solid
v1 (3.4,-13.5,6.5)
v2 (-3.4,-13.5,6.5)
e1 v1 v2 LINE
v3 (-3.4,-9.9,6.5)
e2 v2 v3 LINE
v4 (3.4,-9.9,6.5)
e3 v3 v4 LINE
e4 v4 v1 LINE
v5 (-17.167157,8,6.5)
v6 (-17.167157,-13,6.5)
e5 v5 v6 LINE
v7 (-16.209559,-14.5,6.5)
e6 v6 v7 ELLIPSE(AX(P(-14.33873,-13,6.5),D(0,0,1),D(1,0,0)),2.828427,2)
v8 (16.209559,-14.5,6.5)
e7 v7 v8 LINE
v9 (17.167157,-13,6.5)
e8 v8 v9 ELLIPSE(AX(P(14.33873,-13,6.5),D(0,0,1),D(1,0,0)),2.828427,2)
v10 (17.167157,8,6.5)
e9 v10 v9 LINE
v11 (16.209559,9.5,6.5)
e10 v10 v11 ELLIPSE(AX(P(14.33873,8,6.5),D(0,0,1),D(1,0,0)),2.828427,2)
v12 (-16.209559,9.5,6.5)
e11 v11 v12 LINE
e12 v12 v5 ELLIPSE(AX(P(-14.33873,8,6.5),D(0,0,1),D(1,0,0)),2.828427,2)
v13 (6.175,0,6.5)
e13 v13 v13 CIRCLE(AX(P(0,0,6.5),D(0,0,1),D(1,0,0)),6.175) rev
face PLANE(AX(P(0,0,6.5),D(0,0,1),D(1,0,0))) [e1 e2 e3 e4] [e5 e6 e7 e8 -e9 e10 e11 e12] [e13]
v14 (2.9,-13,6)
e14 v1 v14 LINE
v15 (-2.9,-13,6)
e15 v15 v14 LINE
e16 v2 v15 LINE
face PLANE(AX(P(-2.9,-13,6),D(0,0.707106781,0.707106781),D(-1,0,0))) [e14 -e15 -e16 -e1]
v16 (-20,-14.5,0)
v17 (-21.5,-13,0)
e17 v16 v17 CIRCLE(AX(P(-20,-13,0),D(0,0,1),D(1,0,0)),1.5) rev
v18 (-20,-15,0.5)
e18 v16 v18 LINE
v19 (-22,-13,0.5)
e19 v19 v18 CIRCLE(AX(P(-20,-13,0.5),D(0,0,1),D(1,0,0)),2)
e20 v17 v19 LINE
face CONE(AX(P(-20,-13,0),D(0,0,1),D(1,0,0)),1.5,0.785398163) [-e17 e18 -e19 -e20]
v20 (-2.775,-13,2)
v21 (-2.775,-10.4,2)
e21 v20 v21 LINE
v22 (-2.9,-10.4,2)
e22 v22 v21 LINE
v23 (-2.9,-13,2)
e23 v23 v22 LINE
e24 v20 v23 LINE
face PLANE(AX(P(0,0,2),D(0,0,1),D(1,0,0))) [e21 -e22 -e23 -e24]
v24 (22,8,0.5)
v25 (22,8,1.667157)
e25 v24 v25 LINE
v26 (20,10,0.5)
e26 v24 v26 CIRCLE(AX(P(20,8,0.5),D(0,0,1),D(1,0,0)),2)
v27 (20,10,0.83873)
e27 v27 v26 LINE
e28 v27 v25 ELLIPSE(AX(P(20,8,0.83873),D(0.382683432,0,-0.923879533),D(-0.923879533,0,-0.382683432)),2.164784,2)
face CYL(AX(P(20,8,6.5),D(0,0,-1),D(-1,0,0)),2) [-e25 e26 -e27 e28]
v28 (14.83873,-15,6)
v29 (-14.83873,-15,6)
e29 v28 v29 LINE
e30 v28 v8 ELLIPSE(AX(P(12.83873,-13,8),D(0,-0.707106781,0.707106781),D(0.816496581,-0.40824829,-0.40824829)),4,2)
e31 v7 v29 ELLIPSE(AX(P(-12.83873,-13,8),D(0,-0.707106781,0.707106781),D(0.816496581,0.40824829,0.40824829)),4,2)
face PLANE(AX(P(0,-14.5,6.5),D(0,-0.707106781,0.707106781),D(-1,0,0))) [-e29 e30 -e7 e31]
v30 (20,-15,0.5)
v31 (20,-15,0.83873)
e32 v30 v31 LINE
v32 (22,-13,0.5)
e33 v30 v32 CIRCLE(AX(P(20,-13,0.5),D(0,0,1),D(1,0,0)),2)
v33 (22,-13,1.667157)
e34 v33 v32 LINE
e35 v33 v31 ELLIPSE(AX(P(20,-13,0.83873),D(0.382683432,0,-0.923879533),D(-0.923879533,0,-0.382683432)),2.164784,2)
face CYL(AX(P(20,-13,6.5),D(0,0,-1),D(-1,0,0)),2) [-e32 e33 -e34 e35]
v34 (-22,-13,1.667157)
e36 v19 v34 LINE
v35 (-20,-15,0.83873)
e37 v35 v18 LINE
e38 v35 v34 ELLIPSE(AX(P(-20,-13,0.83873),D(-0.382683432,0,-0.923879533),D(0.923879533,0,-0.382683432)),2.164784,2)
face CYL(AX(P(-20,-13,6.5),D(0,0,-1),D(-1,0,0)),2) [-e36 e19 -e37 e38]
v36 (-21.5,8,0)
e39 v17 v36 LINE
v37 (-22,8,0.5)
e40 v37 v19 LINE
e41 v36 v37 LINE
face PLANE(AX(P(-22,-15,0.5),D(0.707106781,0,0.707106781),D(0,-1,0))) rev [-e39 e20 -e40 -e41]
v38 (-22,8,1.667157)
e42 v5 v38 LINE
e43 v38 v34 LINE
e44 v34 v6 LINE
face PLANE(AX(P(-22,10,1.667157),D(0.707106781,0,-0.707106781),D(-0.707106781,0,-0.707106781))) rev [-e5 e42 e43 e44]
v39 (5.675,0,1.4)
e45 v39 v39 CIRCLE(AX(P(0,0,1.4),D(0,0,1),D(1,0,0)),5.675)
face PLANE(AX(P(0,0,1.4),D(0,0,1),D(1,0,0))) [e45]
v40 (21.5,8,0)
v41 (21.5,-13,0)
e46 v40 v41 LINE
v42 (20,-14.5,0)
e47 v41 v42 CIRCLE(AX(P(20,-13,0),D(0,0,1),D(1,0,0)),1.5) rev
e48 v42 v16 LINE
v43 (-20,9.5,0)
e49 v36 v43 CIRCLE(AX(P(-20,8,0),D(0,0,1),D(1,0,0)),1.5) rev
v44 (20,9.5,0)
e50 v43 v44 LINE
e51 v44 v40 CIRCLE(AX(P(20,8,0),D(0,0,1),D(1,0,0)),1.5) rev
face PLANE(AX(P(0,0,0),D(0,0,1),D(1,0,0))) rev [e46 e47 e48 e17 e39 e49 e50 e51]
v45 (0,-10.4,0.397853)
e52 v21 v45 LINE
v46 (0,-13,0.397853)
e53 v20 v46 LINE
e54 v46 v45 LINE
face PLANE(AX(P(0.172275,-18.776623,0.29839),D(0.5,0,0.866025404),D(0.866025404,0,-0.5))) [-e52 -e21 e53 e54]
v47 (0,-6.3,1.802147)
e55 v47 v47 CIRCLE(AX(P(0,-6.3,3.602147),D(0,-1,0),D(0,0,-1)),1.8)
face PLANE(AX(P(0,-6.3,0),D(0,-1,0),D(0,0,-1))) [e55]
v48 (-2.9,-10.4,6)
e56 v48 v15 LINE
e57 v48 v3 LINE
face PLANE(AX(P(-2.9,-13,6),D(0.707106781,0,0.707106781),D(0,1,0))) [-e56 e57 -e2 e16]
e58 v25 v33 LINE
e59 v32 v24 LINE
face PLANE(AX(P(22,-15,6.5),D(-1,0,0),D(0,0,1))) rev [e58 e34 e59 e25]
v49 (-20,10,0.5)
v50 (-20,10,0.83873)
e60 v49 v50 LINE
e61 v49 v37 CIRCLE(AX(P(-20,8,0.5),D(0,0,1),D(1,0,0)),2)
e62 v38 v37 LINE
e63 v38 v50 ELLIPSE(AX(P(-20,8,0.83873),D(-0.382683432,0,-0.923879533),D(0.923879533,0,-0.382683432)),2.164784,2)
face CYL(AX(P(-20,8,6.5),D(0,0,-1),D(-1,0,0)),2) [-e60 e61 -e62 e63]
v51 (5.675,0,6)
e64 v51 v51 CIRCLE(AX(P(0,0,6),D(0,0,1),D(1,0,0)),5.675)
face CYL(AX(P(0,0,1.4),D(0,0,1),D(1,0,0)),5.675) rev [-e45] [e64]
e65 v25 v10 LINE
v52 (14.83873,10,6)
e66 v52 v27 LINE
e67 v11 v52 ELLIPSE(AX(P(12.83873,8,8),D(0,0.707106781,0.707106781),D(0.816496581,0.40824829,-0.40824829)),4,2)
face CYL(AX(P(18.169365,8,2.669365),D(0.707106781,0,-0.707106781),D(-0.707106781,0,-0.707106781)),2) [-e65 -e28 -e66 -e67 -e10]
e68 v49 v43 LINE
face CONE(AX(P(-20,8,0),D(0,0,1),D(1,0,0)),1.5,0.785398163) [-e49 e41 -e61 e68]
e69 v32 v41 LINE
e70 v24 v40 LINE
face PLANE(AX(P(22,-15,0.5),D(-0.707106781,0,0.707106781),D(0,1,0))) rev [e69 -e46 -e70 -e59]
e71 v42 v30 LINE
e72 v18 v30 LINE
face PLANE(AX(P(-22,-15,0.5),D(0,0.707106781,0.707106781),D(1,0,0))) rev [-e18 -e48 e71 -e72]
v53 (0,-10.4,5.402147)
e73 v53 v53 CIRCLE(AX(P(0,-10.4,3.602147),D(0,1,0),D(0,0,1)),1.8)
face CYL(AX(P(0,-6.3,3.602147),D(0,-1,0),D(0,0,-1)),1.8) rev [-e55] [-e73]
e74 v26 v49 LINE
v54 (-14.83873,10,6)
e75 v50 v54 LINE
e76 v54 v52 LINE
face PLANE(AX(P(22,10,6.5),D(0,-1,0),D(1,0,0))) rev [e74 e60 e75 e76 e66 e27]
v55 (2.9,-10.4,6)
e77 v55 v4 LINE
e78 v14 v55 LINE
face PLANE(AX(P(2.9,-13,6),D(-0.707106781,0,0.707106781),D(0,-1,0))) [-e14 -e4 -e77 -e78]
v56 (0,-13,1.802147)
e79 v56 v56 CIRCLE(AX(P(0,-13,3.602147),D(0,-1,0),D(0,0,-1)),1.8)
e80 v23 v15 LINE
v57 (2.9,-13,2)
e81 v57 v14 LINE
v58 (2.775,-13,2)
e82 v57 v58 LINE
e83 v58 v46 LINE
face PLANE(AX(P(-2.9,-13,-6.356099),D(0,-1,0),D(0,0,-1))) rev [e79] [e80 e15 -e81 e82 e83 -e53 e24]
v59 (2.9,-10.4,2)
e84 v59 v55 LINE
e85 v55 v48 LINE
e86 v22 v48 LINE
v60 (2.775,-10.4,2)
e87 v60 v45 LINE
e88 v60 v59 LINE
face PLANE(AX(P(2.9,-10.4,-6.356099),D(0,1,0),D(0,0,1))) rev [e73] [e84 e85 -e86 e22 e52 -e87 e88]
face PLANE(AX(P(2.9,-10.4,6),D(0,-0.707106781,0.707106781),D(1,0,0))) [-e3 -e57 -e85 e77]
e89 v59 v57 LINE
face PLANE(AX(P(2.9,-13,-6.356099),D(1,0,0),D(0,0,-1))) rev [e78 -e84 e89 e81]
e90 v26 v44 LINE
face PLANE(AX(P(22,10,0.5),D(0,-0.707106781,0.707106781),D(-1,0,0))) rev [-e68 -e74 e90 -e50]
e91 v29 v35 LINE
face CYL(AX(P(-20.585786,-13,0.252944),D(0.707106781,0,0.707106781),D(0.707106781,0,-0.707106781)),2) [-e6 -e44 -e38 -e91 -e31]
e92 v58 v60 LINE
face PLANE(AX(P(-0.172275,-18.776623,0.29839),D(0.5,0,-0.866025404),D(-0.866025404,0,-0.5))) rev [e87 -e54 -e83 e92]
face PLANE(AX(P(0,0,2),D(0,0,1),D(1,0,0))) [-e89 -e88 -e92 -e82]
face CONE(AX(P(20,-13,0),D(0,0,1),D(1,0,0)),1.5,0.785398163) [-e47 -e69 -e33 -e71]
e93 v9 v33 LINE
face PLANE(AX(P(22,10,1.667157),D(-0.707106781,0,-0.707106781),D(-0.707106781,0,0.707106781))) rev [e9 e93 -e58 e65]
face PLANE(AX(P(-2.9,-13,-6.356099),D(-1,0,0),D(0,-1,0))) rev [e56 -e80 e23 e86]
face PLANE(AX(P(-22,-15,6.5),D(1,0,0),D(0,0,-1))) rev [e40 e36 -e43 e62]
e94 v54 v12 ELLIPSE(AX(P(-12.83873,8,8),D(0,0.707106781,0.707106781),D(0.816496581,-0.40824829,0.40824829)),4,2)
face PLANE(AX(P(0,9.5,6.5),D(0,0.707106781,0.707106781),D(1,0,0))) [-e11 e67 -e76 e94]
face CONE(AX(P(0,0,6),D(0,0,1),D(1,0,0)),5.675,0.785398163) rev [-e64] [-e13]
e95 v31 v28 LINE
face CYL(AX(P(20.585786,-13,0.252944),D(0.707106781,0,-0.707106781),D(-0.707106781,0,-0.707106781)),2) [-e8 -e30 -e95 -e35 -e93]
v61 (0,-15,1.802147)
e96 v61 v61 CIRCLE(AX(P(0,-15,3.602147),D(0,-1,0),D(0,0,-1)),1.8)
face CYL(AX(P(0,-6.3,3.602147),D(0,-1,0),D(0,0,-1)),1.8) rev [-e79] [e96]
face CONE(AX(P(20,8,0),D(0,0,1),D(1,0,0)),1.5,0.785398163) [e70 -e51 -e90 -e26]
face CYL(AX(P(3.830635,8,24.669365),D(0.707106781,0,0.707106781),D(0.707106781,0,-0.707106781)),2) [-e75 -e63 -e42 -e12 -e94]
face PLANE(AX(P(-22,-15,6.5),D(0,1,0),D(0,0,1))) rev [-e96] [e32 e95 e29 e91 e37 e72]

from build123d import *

# Parameters (mm, degrees)
SKIZZE1_W                            = 44
SKIZZE1_H                            = 25
AUFSATZ_LINEAR_AUSTRAGEN1_DEPTH      = 6.5
SKIZZE2_R                            = 5.675
SCHNITT_LINEAR_AUSTRAGEN1_DEPTH      = 5.1
VERRUNDUNG1_R                        = 2
SKIZZE8_W                            = 5.8
SKIZZE8_H                            = 2.6
SCHNITT_LINEAR_AUSTRAGEN5_DEPTH      = 4.5
SCHNITT_LINEAR_AUSTRAGEN6_DEPTH      = 2.6
SCHNITT_LINEAR_AUSTRAGEN7_DEPTH      = 31.698697041
SCHNITT_LINEAR_AUSTRAGEN7_DEPTH_BACK = 4.1
SCHNITT_LINEAR_AUSTRAGEN8_DEPTH      = 34.930075155
FASE1_SIZE                           = 0.5
VERRUNDUNG2_R                        = 2


with BuildPart() as part:
    # Skizze1 → Aufsatz-Linear austragen1 (new body)
    with BuildSketch(Plane.XY):
        with Locations((0, -2.5)):
            Rectangle(SKIZZE1_W, SKIZZE1_H)
    extrude(amount=AUFSATZ_LINEAR_AUSTRAGEN1_DEPTH)

    # Skizze2 → Schnitt-Linear austragen1 (cut)
    with BuildSketch(Plane.XY.offset(6.5)):
        Circle(SKIZZE2_R)
    extrude(amount=-SCHNITT_LINEAR_AUSTRAGEN1_DEPTH, mode=Mode.SUBTRACT)

    # Verrundung1
    verrundung1_edges = [part.edges().sort_by_distance(p)[0] for p in [
        (-22, 10, 3.25),
        (22, 10, 3.25),
        (22, -15, 3.25),
        (-22, -15, 3.25),
    ]]
    fillet(verrundung1_edges, radius=VERRUNDUNG1_R)

    # Skizze8 → Schnitt-Linear austragen5 (cut)
    with BuildSketch(Plane.XY.offset(6.5)):
        with Locations((0, -11.7)):
            Rectangle(SKIZZE8_W, SKIZZE8_H)
    extrude(amount=-SCHNITT_LINEAR_AUSTRAGEN5_DEPTH, mode=Mode.SUBTRACT)

    # Skizze9 → Schnitt-Linear austragen6 (cut)
    with BuildSketch(Plane.XZ.offset(10.4)):
        with BuildLine():
            Line((-0.820441954, 2), (-2.775, 2))
            Line((-2.775, 2), (0, 0.397853003))
            Line((0, 0.397853003), (2.775, 2))
            Line((2.775, 2), (0.820441954, 2))
            ThreePointArc((0.820441954, 2), (0, 1.802146997), (-0.820441954, 2))
        make_face()
        with BuildLine():
            ThreePointArc((1.8, 3.602146997), (-0.938936761, 5.137854573), (-0.820441954, 2))
            Line((-0.820441954, 2), (0.820441954, 2))
            ThreePointArc((0.820441954, 2), (1.535707576, 2.663210236), (1.8, 3.602146997))
        make_face()
        with BuildLine():
            Line((0.820441954, 2), (-0.820441954, 2))
            ThreePointArc((-0.820441954, 2), (0, 1.802146997), (0.820441954, 2))
        make_face()
    extrude(amount=SCHNITT_LINEAR_AUSTRAGEN6_DEPTH, mode=Mode.SUBTRACT)

    # Skizze9<3> → Schnitt-Linear austragen7 (cut, two sides: drawn at the far end of the back side and taken through both)
    with BuildSketch(Plane.XZ.offset(10.4).offset(-SCHNITT_LINEAR_AUSTRAGEN7_DEPTH_BACK)):
        with BuildLine():
            ThreePointArc((1.8, 3.602146997), (-0.938936761, 5.137854573), (-0.820441954, 2))
            Line((-0.820441954, 2), (0.820441954, 2))
            ThreePointArc((0.820441954, 2), (1.535707576, 2.663210236), (1.8, 3.602146997))
        make_face()
        with BuildLine():
            Line((0.820441954, 2), (-0.820441954, 2))
            ThreePointArc((-0.820441954, 2), (0, 1.802146997), (0.820441954, 2))
        make_face()
    extrude(amount=SCHNITT_LINEAR_AUSTRAGEN7_DEPTH + SCHNITT_LINEAR_AUSTRAGEN7_DEPTH_BACK, mode=Mode.SUBTRACT)

    # Skizze10 → Schnitt-Linear austragen8 (cut, through all)
    with BuildSketch(Plane.XZ.offset(15)):
        Polygon((-22, 1.667157288), (-17.167157288, 6.5), (-22, 6.5), align=None)
        Polygon((22, 1.667157288), (22, 6.5), (17.167157288, 6.5), align=None)
    extrude(amount=-SCHNITT_LINEAR_AUSTRAGEN8_DEPTH, mode=Mode.SUBTRACT)

    # Fase1
    fase1_edges = [part.edges().sort_by_distance(p)[0] for p in [
        (-5.675, 0, 6.5),
        (0, 10, 0),
        (-22, -2.5, 0),
        (22, -2.5, 0),
        (0, -15, 0),
        (-21.414213562, -14.414213562, 0),
        (-21.414213562, 9.414213562, 0),
        (21.414213562, -14.414213562, 0),
        (21.414213562, 9.414213562, 0),
        (2.9, -11.7, 6.5),
        (0, -10.4, 6.5),
        (-2.9, -11.7, 6.5),
        (0, -13, 6.5),
        (0, 10, 6.5),
        (0, -15, 6.5),
    ]]
    chamfer(fase1_edges, length=FASE1_SIZE)

    # Verrundung2
    # the kernel refuses this fillet: 2 mm, written as the material it takes off along each edge
    with BuildSketch(Plane(origin=(-23.535533906, 10, 0.131623382), x_dir=(0.7071067811865477, 0, -0.7071067811865477), z_dir=(0.7071067811865476, 0, 0.7071067811865476)), Plane(origin=(14.131623382, 10, 9.535533906), x_dir=(-0.7071067811865476, 0, -0.7071067811865476), z_dir=(0.7071067811865476, 0, -0.7071067811865475)), Plane(origin=(14.131623382, -15, 9.535533906), x_dir=(0, 1, 0), z_dir=(0.7071067811865476, 0, -0.7071067811865475)), Plane(origin=(-23.535533906, -15, 0.131623382), x_dir=(0, 1, 0), z_dir=(0.7071067811865476, 0, 0.7071067811865476))) as verrundung2_piece_1:
        with BuildLine():
            CenterArc((VERRUNDUNG2_R, -VERRUNDUNG2_R), VERRUNDUNG2_R, 90, 90)
            Line((0, -VERRUNDUNG2_R), (0, 0))
            Line((0, 0), (VERRUNDUNG2_R, 0))
        make_face()
    extrude(amount=13.299137803, mode=Mode.SUBTRACT)


solid = part.part
